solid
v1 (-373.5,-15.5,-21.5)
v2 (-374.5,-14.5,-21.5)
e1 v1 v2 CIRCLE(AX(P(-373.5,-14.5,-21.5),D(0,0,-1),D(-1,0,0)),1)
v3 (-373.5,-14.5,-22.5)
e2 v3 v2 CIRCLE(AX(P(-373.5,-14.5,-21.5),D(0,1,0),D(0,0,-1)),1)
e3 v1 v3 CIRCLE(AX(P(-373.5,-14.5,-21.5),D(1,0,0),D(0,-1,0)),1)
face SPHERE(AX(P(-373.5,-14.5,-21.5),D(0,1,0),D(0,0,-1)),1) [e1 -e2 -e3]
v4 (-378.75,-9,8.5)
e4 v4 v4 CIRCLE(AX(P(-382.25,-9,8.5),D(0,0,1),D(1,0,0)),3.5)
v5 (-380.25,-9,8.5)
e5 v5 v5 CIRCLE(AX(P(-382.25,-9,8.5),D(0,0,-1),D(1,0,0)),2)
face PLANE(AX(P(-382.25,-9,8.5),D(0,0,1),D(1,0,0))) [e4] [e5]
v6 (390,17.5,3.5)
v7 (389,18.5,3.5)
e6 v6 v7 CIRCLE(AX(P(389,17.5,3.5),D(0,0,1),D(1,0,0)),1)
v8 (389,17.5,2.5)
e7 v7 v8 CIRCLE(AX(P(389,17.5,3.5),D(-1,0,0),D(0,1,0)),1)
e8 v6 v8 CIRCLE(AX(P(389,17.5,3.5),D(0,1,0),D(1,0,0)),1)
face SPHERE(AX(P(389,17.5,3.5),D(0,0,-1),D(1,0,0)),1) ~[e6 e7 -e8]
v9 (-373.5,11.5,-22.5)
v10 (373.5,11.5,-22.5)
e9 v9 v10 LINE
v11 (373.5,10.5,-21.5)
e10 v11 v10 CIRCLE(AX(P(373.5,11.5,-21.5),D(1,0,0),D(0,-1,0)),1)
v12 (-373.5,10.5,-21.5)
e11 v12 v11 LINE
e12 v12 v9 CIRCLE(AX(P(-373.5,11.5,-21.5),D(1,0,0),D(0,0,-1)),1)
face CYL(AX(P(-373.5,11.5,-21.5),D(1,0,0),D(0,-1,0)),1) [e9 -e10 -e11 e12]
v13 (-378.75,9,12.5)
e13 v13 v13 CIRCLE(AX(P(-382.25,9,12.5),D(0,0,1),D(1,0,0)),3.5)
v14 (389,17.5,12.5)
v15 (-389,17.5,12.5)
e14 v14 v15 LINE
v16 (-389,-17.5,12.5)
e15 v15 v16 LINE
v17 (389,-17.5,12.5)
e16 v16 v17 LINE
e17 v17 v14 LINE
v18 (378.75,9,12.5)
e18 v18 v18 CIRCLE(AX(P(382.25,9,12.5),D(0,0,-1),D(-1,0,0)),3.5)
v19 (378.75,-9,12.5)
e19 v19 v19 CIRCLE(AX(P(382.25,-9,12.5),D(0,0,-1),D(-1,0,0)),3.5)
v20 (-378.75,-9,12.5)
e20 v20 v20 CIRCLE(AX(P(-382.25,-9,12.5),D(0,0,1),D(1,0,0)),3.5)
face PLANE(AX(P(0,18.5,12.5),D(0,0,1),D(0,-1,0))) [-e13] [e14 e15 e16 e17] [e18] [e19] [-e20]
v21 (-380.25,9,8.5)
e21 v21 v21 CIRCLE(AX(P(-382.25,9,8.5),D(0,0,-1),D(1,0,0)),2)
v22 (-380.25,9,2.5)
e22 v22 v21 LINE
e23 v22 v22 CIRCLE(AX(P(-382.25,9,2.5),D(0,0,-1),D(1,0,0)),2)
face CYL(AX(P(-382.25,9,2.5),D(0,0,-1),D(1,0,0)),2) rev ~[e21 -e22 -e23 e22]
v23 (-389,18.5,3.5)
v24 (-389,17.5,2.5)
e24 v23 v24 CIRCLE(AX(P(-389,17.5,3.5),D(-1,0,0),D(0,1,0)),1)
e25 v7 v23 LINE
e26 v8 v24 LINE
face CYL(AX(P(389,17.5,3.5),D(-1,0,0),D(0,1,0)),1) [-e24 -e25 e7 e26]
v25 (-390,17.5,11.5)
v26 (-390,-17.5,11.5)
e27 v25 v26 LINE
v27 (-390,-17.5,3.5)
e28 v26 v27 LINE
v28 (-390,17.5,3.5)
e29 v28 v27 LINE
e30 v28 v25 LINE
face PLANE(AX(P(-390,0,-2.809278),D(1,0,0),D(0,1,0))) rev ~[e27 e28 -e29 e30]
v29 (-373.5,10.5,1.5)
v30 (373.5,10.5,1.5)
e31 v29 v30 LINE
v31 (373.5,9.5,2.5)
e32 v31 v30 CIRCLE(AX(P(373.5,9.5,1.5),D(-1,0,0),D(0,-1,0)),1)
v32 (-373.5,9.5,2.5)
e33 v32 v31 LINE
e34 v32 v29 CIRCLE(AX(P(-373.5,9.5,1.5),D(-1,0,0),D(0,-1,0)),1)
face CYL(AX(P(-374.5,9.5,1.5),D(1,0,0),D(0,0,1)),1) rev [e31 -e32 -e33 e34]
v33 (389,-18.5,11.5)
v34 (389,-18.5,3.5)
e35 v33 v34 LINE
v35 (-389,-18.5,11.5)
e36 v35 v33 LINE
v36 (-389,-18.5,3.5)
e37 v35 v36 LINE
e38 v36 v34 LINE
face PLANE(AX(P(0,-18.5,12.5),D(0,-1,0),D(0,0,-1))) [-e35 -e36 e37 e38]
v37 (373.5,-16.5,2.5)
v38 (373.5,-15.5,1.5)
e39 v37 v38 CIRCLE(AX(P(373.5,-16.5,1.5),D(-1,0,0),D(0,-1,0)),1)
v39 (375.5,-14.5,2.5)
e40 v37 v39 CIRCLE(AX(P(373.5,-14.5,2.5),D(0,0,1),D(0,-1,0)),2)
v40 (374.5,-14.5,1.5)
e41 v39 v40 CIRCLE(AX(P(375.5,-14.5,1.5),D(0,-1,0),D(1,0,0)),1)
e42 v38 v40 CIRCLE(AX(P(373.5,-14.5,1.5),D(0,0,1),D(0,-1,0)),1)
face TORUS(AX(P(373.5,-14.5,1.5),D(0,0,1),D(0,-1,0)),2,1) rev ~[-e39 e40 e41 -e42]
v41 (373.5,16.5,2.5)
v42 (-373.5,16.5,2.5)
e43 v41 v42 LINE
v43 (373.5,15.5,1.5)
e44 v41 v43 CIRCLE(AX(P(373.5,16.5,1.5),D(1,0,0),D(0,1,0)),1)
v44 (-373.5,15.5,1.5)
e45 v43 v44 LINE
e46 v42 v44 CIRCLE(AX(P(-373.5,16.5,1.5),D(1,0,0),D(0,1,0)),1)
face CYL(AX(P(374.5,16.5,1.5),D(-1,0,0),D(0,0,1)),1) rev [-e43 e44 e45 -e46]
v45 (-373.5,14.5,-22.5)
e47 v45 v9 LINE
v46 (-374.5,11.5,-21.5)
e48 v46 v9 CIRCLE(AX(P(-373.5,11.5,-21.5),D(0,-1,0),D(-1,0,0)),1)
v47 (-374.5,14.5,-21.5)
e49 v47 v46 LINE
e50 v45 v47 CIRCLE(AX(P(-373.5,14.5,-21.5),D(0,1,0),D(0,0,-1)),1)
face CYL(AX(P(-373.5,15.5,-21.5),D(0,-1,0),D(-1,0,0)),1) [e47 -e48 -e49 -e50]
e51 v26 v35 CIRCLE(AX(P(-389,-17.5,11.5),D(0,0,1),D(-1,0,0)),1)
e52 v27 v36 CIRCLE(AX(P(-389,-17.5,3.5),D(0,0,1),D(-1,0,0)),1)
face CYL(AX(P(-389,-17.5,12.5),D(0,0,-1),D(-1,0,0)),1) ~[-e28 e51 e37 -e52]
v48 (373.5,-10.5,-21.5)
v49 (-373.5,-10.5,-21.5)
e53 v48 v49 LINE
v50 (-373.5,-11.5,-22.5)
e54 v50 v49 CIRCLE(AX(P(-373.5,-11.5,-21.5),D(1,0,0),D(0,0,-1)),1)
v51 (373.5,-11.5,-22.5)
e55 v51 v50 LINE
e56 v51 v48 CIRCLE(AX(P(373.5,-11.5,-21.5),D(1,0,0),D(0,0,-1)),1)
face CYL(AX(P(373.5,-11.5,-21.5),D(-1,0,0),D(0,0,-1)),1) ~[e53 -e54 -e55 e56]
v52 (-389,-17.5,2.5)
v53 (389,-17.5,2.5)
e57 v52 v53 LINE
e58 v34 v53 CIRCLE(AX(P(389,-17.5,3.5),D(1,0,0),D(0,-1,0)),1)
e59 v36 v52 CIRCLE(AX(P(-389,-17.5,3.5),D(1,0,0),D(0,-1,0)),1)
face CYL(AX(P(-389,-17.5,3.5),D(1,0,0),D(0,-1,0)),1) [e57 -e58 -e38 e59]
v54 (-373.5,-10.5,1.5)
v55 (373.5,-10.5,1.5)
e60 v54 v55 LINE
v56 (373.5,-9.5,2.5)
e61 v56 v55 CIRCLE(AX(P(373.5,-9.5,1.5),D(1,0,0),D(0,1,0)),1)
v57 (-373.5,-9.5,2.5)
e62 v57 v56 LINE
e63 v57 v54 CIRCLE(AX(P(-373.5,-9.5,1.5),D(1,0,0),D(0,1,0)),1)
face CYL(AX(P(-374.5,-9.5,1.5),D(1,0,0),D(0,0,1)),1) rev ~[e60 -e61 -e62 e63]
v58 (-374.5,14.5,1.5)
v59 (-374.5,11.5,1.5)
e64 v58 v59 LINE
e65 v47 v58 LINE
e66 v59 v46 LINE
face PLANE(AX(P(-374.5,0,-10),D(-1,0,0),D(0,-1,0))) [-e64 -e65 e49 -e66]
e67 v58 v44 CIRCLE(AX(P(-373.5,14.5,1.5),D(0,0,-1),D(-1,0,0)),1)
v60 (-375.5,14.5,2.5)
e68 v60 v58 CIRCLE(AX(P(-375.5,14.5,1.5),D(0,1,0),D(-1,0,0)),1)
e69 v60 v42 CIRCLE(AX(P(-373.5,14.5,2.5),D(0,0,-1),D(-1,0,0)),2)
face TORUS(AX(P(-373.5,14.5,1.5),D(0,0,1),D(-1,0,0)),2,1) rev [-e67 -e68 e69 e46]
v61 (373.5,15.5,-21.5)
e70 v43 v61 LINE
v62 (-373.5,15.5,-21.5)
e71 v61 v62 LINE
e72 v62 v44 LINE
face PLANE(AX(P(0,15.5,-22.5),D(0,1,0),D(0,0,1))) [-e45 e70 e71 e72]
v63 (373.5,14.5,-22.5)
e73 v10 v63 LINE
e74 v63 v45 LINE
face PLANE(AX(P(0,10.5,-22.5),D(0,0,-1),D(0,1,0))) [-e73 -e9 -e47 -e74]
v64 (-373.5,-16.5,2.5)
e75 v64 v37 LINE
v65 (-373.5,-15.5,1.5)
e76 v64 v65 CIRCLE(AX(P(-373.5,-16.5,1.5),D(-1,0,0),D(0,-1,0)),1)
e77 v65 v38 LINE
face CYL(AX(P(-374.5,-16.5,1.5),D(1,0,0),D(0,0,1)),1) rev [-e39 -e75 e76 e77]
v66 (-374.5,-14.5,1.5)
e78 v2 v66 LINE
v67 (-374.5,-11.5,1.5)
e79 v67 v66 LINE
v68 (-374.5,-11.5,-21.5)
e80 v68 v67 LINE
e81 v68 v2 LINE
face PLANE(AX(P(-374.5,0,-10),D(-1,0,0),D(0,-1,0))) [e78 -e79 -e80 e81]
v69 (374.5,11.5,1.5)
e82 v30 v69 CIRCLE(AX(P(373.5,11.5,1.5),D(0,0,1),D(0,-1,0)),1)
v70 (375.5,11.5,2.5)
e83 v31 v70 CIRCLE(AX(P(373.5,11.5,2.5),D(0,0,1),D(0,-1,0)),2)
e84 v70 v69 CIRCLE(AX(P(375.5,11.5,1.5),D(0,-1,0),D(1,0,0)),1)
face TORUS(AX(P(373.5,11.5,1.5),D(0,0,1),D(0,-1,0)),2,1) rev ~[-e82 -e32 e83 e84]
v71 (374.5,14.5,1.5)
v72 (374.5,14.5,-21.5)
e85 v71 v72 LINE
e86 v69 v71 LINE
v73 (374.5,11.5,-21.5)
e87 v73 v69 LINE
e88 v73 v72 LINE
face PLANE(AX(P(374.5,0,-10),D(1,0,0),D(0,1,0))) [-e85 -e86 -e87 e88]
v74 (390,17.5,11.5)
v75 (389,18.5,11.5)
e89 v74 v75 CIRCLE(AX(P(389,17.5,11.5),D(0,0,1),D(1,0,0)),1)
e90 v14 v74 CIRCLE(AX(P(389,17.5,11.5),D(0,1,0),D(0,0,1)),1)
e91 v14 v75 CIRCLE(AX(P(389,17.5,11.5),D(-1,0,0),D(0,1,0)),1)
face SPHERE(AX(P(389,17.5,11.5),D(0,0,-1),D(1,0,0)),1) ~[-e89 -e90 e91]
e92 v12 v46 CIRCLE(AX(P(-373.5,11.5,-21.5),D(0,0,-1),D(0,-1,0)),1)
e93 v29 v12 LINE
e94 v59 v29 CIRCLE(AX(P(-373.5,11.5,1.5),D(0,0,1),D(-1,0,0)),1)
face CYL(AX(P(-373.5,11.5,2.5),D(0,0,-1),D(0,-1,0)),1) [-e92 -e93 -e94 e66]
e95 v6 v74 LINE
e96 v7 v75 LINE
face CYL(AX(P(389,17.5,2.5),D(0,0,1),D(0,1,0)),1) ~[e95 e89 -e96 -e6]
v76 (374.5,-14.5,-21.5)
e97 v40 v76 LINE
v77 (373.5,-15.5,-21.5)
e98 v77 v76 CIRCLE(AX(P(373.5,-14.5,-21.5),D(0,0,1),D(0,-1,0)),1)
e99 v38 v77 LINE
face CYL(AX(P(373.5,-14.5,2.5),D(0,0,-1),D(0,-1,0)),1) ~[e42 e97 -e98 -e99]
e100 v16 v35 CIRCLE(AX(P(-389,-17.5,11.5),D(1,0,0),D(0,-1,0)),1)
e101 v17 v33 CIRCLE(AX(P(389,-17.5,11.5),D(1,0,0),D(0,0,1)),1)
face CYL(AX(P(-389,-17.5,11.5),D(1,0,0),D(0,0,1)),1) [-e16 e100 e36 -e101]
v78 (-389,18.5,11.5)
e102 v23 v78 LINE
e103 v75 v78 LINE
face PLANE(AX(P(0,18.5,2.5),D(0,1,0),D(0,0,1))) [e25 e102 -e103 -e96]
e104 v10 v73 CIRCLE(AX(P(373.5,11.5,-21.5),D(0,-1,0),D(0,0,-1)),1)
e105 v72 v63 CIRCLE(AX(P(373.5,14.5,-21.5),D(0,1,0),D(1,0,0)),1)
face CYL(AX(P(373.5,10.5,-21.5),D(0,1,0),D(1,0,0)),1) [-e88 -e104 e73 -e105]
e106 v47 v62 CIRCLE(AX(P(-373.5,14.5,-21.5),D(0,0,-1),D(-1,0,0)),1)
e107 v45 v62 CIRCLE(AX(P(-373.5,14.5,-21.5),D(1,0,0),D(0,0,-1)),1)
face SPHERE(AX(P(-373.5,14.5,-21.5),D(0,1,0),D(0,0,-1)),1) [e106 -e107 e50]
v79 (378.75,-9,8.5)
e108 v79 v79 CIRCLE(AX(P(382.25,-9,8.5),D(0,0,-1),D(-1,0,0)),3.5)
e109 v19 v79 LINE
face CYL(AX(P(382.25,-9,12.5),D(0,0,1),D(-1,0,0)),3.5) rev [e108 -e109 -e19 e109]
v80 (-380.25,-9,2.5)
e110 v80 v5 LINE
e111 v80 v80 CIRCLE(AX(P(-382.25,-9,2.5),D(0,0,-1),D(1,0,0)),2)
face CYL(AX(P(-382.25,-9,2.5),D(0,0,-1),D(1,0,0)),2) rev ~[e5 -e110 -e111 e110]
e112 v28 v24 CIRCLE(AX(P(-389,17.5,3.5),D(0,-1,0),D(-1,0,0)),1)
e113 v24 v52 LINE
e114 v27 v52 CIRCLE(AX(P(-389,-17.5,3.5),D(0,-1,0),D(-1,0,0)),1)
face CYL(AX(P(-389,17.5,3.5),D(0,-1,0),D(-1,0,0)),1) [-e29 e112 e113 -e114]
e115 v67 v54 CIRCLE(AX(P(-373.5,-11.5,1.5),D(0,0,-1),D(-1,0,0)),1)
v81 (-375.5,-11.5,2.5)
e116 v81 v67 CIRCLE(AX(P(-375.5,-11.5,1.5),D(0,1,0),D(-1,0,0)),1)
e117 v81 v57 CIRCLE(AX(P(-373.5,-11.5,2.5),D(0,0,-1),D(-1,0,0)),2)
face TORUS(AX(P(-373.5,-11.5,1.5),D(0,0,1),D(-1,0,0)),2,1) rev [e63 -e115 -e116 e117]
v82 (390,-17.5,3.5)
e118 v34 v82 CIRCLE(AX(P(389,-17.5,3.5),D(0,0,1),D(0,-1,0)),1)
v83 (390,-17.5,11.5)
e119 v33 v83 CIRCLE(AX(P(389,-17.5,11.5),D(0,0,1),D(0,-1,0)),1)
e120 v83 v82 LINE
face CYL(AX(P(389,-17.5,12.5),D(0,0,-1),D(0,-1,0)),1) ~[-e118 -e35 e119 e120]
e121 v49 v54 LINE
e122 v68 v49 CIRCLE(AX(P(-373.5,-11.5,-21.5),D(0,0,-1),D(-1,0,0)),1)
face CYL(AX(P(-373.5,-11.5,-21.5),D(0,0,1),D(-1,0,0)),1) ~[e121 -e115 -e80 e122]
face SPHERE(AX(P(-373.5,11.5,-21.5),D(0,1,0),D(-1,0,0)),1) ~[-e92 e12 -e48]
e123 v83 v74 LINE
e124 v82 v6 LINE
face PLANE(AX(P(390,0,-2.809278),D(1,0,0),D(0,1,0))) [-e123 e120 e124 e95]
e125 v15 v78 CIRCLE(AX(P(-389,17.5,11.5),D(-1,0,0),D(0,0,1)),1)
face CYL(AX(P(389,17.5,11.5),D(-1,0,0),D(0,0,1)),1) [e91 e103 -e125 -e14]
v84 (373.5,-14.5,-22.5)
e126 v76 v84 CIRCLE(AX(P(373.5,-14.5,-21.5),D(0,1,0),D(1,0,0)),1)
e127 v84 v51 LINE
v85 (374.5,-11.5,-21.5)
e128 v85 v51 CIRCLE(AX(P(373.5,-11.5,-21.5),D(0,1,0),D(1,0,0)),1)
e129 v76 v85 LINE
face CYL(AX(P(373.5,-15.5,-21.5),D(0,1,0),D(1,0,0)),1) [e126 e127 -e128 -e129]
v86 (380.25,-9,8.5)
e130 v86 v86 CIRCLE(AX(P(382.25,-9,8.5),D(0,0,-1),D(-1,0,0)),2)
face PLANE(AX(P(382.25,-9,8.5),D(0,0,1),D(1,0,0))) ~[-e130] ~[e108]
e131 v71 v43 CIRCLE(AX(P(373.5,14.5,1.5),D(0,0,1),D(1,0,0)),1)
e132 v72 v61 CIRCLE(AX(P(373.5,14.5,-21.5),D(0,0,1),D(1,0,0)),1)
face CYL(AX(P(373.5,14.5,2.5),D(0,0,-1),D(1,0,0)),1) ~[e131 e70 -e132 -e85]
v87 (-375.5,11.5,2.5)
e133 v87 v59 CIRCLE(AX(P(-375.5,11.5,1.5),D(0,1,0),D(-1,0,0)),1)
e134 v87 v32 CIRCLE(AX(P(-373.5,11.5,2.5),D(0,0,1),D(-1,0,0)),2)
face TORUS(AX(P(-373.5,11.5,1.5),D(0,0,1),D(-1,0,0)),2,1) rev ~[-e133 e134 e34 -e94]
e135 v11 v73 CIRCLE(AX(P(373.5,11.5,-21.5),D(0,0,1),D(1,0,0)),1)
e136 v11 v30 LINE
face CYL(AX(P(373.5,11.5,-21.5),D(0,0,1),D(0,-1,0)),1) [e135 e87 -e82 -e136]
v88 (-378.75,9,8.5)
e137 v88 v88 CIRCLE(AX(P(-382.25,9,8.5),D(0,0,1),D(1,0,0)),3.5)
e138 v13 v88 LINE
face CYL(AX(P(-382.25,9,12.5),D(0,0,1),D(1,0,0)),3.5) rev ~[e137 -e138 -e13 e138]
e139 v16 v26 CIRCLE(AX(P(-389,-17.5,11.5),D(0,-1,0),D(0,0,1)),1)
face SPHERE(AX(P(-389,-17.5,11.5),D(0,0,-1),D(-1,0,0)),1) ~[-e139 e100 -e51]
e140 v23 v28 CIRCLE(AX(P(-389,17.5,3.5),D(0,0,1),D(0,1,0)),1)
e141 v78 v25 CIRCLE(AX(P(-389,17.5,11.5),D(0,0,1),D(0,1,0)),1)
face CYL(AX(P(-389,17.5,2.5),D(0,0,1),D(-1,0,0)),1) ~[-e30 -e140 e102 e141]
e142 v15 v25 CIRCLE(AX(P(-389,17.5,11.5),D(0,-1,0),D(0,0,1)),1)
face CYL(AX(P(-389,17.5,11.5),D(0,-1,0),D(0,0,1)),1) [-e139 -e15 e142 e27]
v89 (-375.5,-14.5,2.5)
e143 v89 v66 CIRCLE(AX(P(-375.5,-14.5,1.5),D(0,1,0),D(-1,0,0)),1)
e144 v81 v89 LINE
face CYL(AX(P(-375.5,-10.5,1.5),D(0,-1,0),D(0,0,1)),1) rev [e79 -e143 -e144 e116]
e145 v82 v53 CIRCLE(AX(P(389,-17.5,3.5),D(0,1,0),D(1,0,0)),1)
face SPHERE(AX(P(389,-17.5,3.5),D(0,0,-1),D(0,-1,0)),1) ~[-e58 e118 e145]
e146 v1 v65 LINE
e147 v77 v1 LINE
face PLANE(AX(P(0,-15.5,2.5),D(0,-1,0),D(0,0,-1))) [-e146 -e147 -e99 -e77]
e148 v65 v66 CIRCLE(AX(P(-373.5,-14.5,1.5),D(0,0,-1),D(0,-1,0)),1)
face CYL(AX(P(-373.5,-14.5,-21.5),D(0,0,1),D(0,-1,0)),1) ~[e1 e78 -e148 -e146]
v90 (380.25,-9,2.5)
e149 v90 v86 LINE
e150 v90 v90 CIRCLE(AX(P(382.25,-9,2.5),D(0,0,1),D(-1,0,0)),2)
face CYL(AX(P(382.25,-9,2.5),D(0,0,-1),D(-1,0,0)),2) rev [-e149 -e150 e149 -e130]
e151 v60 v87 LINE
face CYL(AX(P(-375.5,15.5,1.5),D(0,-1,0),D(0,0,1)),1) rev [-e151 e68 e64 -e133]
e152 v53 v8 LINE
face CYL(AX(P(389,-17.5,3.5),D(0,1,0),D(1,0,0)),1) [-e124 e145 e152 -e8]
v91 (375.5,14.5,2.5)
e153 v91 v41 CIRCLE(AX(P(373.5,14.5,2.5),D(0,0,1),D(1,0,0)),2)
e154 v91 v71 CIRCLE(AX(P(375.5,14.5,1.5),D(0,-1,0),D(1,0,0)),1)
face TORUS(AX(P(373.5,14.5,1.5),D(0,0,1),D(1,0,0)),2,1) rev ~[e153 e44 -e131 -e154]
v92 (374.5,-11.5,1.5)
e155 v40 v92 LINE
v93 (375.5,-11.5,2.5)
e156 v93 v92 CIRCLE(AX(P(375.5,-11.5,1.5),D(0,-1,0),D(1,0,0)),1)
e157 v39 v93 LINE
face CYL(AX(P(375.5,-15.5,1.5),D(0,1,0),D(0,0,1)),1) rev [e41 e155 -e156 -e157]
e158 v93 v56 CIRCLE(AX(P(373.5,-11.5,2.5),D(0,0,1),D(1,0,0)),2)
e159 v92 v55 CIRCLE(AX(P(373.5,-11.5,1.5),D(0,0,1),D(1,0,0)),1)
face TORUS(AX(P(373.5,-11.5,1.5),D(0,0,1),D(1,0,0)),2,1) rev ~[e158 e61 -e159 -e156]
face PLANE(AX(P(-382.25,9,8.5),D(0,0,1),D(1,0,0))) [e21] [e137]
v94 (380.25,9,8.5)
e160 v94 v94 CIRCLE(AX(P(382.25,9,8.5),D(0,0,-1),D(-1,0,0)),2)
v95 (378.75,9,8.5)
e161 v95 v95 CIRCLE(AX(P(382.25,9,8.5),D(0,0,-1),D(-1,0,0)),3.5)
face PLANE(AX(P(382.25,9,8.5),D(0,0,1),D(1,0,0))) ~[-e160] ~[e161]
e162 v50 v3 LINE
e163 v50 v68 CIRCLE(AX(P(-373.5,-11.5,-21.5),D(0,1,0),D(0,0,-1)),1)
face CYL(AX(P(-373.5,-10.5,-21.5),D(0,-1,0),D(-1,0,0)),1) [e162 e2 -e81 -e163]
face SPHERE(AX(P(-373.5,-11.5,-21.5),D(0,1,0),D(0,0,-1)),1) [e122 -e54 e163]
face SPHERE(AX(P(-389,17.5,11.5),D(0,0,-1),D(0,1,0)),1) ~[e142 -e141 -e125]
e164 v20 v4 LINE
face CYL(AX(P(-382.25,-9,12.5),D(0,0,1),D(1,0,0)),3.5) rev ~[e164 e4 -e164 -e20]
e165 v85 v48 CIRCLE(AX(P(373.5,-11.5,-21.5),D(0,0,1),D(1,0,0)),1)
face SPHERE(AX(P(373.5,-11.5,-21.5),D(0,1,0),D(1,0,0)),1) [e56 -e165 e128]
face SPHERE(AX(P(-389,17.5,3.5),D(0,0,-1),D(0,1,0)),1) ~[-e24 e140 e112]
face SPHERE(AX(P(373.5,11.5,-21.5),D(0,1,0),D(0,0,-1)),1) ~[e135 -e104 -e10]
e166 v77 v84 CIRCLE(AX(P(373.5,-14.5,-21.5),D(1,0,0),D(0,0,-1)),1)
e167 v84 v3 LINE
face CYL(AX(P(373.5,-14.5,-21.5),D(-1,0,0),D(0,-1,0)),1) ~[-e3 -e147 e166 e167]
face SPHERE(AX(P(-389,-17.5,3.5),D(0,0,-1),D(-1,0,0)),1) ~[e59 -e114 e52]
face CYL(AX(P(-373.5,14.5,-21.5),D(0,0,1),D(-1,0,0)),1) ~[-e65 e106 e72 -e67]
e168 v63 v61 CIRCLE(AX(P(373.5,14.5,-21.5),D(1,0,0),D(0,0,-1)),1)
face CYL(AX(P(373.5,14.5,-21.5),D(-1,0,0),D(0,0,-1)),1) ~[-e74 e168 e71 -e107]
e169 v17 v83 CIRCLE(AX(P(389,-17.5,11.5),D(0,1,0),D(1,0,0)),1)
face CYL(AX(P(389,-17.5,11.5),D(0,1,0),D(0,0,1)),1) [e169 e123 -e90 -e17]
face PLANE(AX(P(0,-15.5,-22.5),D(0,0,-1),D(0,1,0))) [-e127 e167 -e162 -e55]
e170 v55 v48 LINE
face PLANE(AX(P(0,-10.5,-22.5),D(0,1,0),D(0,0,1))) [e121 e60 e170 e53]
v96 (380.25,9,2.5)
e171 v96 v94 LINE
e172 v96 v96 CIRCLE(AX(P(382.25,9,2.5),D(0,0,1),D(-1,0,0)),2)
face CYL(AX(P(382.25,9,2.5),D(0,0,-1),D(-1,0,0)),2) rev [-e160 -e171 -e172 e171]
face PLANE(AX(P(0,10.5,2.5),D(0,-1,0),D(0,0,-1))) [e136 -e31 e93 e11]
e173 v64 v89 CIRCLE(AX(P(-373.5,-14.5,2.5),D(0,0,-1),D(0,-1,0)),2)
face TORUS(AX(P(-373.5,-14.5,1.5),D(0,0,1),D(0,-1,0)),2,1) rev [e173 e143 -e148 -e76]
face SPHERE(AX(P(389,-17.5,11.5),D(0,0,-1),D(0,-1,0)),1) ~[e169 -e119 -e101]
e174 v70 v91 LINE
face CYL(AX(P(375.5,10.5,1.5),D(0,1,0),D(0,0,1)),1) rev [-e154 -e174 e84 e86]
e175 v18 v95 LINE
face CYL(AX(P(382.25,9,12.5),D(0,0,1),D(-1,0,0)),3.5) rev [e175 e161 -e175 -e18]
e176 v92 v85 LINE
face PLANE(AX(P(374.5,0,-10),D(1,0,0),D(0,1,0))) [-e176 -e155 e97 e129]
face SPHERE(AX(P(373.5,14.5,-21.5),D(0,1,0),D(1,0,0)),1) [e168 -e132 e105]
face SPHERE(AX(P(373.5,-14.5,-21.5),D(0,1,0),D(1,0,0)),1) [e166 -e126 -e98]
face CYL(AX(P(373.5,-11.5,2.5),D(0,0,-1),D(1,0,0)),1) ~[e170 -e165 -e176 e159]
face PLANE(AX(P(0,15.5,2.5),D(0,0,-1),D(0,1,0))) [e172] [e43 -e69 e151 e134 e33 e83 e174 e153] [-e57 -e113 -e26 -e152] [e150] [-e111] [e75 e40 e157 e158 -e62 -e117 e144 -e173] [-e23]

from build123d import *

# Parameters (mm, degrees)
F1_DEPTH = 390
F2_W     = 31
F2_H     = 25
F3_DEPTH = 15.5
F4_W     = 31
F4_H     = 25
F5_DEPTH = 15.5
F6_R     = 2
F7_DEPTH = 10.001
F8_R     = 3.5
F9_DEPTH = 4
F10_R    = 1
F11_R    = 1


# Not quite as in the source:
# - a pattern or mirror of a feature is missing from the dataset's text; its kind, count and spacing are read off the source's solid


with BuildPart() as f1:
    # F0 (on Right) → F1 (new body, symmetric)
    with BuildSketch(Plane.YZ):
        Polygon((18.5, 12.5), (-18.5, 12.5), (-18.5, 2.5), (-15.5, 2.5), (-15.5, -22.5), (-10.5, -22.5), (-10.5, 2.5), (0, 2.5), (10.5, 2.5), (10.5, -22.5), (15.5, -22.5), (15.5, 2.5), (18.5, 2.5), align=None)
    extrude(amount=F1_DEPTH, both=True)

    # F2 (on face) → F3 (cut)
    with BuildSketch(Plane(origin=(-390, 0, 0), x_dir=(0, -1, 0), z_dir=(-1, 0, 0))):
        with Locations((0, -10)):
            Rectangle(F2_W, F2_H)
    extrude(amount=-F3_DEPTH, mode=Mode.SUBTRACT)

    # F4 (on face) → F5 (cut)
    with BuildSketch(Plane.YZ.offset(390)):
        with Locations((0, -10)):
            Rectangle(F4_W, F4_H)
    extrude(amount=-F5_DEPTH, mode=Mode.SUBTRACT)

    # F6 (on face) → F7 (cut, through all)
    with BuildSketch(Plane(origin=(0, 0, 2.5), x_dir=(1, 0, 0), z_dir=(0, 0, -1))):
        with Locations((-382.25, 9)):
            Circle(F6_R)
        with Locations((-382.25, -9)):
            Circle(F6_R)
    f7 = extrude(amount=-F7_DEPTH, mode=Mode.SUBTRACT)

    # F7_copies: F7 across plane
    add(f7.mirror(Plane(origin=(0, 0, 0), x_dir=(0, 0, 1), z_dir=(1, 0, 0))), mode=Mode.SUBTRACT)

    # F8 (on face) → F9 (cut)
    with BuildSketch(Plane.XY.offset(12.5)):
        with Locations((-382.25, -9)):
            Circle(F8_R)
        with Locations((-382.25, 9)):
            Circle(F8_R)
    f9 = extrude(amount=-F9_DEPTH, mode=Mode.SUBTRACT)

    # F9_copies: F9 across plane
    add(f9.mirror(Plane(origin=(0, 0, 0), x_dir=(0, 0, 1), z_dir=(1, 0, 0))), mode=Mode.SUBTRACT)

    # F10
    f10_edges = [f1.edges().sort_by_distance(p)[0] for p in [
        (390, 18.5, 7.5),
        (390, -18.5, 7.5),
        (374.5, 13, -22.5),
        (374.5, -13, -22.5),
        (-390, -18.5, 7.5),
        (-374.5, -13, -22.5),
        (-374.5, 13, -22.5),
        (-390, 18.5, 7.5),
    ]]
    fillet(f10_edges, radius=F10_R)

    # F11
    f11_edges = [f1.edges().sort_by_distance(p)[0] for p in [
        (-374.5, -10.5, -9.5),
        (-374.5, -15.5, -9.5),
        (-374.5, 15.5, -9.5),
        (-374.5, 10.5, -9.5),
        (-374.5, 13, -21.5),
        (-374.5, 13, 2.5),
        (-390, 0, 2.5),
        (-390, 0, 12.5),
        (0, -15.5, 2.5),
        (-389.707107, 18.207107, 12.5),
        (-389.707107, -18.207107, 12.5),
        (0, 18.5, 12.5),
        (0, -18.5, 12.5),
        (389.707107, 18.207107, 12.5),
        (389.707107, -18.207107, 12.5),
        (390, 0, 12.5),
        (-389.707107, 18.207107, 2.5),
        (-389.707107, -18.207107, 2.5),
        (0, 18.5, 2.5),
        (0, -18.5, 2.5),
        (389.707107, 18.207107, 2.5),
        (389.707107, -18.207107, 2.5),
        (390, 0, 2.5),
        (-374.5, -13, 2.5),
        (374.5, -13, 2.5),
        (0, -10.5, 2.5),
        (0, 10.5, 2.5),
        (374.5, 13, 2.5),
        (0, 15.5, 2.5),
        (374.5, -15.5, -9.5),
        (374.207107, -15.5, -22.207107),
        (0, -15.5, -22.5),
        (-374.207107, -15.5, -22.207107),
        (374.5, -10.5, -9.5),
        (0, -10.5, -22.5),
        (-374.207107, -10.5, -22.207107),
        (374.207107, -10.5, -22.207107),
        (374.5, 10.5, -9.5),
        (374.207107, 10.5, -22.207107),
        (0, 10.5, -22.5),
        (-374.207107, 10.5, -22.207107),
        (374.5, 15.5, -9.5),
        (0, 15.5, -22.5),
        (-374.207107, 15.5, -22.207107),
        (374.207107, 15.5, -22.207107),
    ]]
    fillet(f11_edges, radius=F11_R)


solid = f1.part
